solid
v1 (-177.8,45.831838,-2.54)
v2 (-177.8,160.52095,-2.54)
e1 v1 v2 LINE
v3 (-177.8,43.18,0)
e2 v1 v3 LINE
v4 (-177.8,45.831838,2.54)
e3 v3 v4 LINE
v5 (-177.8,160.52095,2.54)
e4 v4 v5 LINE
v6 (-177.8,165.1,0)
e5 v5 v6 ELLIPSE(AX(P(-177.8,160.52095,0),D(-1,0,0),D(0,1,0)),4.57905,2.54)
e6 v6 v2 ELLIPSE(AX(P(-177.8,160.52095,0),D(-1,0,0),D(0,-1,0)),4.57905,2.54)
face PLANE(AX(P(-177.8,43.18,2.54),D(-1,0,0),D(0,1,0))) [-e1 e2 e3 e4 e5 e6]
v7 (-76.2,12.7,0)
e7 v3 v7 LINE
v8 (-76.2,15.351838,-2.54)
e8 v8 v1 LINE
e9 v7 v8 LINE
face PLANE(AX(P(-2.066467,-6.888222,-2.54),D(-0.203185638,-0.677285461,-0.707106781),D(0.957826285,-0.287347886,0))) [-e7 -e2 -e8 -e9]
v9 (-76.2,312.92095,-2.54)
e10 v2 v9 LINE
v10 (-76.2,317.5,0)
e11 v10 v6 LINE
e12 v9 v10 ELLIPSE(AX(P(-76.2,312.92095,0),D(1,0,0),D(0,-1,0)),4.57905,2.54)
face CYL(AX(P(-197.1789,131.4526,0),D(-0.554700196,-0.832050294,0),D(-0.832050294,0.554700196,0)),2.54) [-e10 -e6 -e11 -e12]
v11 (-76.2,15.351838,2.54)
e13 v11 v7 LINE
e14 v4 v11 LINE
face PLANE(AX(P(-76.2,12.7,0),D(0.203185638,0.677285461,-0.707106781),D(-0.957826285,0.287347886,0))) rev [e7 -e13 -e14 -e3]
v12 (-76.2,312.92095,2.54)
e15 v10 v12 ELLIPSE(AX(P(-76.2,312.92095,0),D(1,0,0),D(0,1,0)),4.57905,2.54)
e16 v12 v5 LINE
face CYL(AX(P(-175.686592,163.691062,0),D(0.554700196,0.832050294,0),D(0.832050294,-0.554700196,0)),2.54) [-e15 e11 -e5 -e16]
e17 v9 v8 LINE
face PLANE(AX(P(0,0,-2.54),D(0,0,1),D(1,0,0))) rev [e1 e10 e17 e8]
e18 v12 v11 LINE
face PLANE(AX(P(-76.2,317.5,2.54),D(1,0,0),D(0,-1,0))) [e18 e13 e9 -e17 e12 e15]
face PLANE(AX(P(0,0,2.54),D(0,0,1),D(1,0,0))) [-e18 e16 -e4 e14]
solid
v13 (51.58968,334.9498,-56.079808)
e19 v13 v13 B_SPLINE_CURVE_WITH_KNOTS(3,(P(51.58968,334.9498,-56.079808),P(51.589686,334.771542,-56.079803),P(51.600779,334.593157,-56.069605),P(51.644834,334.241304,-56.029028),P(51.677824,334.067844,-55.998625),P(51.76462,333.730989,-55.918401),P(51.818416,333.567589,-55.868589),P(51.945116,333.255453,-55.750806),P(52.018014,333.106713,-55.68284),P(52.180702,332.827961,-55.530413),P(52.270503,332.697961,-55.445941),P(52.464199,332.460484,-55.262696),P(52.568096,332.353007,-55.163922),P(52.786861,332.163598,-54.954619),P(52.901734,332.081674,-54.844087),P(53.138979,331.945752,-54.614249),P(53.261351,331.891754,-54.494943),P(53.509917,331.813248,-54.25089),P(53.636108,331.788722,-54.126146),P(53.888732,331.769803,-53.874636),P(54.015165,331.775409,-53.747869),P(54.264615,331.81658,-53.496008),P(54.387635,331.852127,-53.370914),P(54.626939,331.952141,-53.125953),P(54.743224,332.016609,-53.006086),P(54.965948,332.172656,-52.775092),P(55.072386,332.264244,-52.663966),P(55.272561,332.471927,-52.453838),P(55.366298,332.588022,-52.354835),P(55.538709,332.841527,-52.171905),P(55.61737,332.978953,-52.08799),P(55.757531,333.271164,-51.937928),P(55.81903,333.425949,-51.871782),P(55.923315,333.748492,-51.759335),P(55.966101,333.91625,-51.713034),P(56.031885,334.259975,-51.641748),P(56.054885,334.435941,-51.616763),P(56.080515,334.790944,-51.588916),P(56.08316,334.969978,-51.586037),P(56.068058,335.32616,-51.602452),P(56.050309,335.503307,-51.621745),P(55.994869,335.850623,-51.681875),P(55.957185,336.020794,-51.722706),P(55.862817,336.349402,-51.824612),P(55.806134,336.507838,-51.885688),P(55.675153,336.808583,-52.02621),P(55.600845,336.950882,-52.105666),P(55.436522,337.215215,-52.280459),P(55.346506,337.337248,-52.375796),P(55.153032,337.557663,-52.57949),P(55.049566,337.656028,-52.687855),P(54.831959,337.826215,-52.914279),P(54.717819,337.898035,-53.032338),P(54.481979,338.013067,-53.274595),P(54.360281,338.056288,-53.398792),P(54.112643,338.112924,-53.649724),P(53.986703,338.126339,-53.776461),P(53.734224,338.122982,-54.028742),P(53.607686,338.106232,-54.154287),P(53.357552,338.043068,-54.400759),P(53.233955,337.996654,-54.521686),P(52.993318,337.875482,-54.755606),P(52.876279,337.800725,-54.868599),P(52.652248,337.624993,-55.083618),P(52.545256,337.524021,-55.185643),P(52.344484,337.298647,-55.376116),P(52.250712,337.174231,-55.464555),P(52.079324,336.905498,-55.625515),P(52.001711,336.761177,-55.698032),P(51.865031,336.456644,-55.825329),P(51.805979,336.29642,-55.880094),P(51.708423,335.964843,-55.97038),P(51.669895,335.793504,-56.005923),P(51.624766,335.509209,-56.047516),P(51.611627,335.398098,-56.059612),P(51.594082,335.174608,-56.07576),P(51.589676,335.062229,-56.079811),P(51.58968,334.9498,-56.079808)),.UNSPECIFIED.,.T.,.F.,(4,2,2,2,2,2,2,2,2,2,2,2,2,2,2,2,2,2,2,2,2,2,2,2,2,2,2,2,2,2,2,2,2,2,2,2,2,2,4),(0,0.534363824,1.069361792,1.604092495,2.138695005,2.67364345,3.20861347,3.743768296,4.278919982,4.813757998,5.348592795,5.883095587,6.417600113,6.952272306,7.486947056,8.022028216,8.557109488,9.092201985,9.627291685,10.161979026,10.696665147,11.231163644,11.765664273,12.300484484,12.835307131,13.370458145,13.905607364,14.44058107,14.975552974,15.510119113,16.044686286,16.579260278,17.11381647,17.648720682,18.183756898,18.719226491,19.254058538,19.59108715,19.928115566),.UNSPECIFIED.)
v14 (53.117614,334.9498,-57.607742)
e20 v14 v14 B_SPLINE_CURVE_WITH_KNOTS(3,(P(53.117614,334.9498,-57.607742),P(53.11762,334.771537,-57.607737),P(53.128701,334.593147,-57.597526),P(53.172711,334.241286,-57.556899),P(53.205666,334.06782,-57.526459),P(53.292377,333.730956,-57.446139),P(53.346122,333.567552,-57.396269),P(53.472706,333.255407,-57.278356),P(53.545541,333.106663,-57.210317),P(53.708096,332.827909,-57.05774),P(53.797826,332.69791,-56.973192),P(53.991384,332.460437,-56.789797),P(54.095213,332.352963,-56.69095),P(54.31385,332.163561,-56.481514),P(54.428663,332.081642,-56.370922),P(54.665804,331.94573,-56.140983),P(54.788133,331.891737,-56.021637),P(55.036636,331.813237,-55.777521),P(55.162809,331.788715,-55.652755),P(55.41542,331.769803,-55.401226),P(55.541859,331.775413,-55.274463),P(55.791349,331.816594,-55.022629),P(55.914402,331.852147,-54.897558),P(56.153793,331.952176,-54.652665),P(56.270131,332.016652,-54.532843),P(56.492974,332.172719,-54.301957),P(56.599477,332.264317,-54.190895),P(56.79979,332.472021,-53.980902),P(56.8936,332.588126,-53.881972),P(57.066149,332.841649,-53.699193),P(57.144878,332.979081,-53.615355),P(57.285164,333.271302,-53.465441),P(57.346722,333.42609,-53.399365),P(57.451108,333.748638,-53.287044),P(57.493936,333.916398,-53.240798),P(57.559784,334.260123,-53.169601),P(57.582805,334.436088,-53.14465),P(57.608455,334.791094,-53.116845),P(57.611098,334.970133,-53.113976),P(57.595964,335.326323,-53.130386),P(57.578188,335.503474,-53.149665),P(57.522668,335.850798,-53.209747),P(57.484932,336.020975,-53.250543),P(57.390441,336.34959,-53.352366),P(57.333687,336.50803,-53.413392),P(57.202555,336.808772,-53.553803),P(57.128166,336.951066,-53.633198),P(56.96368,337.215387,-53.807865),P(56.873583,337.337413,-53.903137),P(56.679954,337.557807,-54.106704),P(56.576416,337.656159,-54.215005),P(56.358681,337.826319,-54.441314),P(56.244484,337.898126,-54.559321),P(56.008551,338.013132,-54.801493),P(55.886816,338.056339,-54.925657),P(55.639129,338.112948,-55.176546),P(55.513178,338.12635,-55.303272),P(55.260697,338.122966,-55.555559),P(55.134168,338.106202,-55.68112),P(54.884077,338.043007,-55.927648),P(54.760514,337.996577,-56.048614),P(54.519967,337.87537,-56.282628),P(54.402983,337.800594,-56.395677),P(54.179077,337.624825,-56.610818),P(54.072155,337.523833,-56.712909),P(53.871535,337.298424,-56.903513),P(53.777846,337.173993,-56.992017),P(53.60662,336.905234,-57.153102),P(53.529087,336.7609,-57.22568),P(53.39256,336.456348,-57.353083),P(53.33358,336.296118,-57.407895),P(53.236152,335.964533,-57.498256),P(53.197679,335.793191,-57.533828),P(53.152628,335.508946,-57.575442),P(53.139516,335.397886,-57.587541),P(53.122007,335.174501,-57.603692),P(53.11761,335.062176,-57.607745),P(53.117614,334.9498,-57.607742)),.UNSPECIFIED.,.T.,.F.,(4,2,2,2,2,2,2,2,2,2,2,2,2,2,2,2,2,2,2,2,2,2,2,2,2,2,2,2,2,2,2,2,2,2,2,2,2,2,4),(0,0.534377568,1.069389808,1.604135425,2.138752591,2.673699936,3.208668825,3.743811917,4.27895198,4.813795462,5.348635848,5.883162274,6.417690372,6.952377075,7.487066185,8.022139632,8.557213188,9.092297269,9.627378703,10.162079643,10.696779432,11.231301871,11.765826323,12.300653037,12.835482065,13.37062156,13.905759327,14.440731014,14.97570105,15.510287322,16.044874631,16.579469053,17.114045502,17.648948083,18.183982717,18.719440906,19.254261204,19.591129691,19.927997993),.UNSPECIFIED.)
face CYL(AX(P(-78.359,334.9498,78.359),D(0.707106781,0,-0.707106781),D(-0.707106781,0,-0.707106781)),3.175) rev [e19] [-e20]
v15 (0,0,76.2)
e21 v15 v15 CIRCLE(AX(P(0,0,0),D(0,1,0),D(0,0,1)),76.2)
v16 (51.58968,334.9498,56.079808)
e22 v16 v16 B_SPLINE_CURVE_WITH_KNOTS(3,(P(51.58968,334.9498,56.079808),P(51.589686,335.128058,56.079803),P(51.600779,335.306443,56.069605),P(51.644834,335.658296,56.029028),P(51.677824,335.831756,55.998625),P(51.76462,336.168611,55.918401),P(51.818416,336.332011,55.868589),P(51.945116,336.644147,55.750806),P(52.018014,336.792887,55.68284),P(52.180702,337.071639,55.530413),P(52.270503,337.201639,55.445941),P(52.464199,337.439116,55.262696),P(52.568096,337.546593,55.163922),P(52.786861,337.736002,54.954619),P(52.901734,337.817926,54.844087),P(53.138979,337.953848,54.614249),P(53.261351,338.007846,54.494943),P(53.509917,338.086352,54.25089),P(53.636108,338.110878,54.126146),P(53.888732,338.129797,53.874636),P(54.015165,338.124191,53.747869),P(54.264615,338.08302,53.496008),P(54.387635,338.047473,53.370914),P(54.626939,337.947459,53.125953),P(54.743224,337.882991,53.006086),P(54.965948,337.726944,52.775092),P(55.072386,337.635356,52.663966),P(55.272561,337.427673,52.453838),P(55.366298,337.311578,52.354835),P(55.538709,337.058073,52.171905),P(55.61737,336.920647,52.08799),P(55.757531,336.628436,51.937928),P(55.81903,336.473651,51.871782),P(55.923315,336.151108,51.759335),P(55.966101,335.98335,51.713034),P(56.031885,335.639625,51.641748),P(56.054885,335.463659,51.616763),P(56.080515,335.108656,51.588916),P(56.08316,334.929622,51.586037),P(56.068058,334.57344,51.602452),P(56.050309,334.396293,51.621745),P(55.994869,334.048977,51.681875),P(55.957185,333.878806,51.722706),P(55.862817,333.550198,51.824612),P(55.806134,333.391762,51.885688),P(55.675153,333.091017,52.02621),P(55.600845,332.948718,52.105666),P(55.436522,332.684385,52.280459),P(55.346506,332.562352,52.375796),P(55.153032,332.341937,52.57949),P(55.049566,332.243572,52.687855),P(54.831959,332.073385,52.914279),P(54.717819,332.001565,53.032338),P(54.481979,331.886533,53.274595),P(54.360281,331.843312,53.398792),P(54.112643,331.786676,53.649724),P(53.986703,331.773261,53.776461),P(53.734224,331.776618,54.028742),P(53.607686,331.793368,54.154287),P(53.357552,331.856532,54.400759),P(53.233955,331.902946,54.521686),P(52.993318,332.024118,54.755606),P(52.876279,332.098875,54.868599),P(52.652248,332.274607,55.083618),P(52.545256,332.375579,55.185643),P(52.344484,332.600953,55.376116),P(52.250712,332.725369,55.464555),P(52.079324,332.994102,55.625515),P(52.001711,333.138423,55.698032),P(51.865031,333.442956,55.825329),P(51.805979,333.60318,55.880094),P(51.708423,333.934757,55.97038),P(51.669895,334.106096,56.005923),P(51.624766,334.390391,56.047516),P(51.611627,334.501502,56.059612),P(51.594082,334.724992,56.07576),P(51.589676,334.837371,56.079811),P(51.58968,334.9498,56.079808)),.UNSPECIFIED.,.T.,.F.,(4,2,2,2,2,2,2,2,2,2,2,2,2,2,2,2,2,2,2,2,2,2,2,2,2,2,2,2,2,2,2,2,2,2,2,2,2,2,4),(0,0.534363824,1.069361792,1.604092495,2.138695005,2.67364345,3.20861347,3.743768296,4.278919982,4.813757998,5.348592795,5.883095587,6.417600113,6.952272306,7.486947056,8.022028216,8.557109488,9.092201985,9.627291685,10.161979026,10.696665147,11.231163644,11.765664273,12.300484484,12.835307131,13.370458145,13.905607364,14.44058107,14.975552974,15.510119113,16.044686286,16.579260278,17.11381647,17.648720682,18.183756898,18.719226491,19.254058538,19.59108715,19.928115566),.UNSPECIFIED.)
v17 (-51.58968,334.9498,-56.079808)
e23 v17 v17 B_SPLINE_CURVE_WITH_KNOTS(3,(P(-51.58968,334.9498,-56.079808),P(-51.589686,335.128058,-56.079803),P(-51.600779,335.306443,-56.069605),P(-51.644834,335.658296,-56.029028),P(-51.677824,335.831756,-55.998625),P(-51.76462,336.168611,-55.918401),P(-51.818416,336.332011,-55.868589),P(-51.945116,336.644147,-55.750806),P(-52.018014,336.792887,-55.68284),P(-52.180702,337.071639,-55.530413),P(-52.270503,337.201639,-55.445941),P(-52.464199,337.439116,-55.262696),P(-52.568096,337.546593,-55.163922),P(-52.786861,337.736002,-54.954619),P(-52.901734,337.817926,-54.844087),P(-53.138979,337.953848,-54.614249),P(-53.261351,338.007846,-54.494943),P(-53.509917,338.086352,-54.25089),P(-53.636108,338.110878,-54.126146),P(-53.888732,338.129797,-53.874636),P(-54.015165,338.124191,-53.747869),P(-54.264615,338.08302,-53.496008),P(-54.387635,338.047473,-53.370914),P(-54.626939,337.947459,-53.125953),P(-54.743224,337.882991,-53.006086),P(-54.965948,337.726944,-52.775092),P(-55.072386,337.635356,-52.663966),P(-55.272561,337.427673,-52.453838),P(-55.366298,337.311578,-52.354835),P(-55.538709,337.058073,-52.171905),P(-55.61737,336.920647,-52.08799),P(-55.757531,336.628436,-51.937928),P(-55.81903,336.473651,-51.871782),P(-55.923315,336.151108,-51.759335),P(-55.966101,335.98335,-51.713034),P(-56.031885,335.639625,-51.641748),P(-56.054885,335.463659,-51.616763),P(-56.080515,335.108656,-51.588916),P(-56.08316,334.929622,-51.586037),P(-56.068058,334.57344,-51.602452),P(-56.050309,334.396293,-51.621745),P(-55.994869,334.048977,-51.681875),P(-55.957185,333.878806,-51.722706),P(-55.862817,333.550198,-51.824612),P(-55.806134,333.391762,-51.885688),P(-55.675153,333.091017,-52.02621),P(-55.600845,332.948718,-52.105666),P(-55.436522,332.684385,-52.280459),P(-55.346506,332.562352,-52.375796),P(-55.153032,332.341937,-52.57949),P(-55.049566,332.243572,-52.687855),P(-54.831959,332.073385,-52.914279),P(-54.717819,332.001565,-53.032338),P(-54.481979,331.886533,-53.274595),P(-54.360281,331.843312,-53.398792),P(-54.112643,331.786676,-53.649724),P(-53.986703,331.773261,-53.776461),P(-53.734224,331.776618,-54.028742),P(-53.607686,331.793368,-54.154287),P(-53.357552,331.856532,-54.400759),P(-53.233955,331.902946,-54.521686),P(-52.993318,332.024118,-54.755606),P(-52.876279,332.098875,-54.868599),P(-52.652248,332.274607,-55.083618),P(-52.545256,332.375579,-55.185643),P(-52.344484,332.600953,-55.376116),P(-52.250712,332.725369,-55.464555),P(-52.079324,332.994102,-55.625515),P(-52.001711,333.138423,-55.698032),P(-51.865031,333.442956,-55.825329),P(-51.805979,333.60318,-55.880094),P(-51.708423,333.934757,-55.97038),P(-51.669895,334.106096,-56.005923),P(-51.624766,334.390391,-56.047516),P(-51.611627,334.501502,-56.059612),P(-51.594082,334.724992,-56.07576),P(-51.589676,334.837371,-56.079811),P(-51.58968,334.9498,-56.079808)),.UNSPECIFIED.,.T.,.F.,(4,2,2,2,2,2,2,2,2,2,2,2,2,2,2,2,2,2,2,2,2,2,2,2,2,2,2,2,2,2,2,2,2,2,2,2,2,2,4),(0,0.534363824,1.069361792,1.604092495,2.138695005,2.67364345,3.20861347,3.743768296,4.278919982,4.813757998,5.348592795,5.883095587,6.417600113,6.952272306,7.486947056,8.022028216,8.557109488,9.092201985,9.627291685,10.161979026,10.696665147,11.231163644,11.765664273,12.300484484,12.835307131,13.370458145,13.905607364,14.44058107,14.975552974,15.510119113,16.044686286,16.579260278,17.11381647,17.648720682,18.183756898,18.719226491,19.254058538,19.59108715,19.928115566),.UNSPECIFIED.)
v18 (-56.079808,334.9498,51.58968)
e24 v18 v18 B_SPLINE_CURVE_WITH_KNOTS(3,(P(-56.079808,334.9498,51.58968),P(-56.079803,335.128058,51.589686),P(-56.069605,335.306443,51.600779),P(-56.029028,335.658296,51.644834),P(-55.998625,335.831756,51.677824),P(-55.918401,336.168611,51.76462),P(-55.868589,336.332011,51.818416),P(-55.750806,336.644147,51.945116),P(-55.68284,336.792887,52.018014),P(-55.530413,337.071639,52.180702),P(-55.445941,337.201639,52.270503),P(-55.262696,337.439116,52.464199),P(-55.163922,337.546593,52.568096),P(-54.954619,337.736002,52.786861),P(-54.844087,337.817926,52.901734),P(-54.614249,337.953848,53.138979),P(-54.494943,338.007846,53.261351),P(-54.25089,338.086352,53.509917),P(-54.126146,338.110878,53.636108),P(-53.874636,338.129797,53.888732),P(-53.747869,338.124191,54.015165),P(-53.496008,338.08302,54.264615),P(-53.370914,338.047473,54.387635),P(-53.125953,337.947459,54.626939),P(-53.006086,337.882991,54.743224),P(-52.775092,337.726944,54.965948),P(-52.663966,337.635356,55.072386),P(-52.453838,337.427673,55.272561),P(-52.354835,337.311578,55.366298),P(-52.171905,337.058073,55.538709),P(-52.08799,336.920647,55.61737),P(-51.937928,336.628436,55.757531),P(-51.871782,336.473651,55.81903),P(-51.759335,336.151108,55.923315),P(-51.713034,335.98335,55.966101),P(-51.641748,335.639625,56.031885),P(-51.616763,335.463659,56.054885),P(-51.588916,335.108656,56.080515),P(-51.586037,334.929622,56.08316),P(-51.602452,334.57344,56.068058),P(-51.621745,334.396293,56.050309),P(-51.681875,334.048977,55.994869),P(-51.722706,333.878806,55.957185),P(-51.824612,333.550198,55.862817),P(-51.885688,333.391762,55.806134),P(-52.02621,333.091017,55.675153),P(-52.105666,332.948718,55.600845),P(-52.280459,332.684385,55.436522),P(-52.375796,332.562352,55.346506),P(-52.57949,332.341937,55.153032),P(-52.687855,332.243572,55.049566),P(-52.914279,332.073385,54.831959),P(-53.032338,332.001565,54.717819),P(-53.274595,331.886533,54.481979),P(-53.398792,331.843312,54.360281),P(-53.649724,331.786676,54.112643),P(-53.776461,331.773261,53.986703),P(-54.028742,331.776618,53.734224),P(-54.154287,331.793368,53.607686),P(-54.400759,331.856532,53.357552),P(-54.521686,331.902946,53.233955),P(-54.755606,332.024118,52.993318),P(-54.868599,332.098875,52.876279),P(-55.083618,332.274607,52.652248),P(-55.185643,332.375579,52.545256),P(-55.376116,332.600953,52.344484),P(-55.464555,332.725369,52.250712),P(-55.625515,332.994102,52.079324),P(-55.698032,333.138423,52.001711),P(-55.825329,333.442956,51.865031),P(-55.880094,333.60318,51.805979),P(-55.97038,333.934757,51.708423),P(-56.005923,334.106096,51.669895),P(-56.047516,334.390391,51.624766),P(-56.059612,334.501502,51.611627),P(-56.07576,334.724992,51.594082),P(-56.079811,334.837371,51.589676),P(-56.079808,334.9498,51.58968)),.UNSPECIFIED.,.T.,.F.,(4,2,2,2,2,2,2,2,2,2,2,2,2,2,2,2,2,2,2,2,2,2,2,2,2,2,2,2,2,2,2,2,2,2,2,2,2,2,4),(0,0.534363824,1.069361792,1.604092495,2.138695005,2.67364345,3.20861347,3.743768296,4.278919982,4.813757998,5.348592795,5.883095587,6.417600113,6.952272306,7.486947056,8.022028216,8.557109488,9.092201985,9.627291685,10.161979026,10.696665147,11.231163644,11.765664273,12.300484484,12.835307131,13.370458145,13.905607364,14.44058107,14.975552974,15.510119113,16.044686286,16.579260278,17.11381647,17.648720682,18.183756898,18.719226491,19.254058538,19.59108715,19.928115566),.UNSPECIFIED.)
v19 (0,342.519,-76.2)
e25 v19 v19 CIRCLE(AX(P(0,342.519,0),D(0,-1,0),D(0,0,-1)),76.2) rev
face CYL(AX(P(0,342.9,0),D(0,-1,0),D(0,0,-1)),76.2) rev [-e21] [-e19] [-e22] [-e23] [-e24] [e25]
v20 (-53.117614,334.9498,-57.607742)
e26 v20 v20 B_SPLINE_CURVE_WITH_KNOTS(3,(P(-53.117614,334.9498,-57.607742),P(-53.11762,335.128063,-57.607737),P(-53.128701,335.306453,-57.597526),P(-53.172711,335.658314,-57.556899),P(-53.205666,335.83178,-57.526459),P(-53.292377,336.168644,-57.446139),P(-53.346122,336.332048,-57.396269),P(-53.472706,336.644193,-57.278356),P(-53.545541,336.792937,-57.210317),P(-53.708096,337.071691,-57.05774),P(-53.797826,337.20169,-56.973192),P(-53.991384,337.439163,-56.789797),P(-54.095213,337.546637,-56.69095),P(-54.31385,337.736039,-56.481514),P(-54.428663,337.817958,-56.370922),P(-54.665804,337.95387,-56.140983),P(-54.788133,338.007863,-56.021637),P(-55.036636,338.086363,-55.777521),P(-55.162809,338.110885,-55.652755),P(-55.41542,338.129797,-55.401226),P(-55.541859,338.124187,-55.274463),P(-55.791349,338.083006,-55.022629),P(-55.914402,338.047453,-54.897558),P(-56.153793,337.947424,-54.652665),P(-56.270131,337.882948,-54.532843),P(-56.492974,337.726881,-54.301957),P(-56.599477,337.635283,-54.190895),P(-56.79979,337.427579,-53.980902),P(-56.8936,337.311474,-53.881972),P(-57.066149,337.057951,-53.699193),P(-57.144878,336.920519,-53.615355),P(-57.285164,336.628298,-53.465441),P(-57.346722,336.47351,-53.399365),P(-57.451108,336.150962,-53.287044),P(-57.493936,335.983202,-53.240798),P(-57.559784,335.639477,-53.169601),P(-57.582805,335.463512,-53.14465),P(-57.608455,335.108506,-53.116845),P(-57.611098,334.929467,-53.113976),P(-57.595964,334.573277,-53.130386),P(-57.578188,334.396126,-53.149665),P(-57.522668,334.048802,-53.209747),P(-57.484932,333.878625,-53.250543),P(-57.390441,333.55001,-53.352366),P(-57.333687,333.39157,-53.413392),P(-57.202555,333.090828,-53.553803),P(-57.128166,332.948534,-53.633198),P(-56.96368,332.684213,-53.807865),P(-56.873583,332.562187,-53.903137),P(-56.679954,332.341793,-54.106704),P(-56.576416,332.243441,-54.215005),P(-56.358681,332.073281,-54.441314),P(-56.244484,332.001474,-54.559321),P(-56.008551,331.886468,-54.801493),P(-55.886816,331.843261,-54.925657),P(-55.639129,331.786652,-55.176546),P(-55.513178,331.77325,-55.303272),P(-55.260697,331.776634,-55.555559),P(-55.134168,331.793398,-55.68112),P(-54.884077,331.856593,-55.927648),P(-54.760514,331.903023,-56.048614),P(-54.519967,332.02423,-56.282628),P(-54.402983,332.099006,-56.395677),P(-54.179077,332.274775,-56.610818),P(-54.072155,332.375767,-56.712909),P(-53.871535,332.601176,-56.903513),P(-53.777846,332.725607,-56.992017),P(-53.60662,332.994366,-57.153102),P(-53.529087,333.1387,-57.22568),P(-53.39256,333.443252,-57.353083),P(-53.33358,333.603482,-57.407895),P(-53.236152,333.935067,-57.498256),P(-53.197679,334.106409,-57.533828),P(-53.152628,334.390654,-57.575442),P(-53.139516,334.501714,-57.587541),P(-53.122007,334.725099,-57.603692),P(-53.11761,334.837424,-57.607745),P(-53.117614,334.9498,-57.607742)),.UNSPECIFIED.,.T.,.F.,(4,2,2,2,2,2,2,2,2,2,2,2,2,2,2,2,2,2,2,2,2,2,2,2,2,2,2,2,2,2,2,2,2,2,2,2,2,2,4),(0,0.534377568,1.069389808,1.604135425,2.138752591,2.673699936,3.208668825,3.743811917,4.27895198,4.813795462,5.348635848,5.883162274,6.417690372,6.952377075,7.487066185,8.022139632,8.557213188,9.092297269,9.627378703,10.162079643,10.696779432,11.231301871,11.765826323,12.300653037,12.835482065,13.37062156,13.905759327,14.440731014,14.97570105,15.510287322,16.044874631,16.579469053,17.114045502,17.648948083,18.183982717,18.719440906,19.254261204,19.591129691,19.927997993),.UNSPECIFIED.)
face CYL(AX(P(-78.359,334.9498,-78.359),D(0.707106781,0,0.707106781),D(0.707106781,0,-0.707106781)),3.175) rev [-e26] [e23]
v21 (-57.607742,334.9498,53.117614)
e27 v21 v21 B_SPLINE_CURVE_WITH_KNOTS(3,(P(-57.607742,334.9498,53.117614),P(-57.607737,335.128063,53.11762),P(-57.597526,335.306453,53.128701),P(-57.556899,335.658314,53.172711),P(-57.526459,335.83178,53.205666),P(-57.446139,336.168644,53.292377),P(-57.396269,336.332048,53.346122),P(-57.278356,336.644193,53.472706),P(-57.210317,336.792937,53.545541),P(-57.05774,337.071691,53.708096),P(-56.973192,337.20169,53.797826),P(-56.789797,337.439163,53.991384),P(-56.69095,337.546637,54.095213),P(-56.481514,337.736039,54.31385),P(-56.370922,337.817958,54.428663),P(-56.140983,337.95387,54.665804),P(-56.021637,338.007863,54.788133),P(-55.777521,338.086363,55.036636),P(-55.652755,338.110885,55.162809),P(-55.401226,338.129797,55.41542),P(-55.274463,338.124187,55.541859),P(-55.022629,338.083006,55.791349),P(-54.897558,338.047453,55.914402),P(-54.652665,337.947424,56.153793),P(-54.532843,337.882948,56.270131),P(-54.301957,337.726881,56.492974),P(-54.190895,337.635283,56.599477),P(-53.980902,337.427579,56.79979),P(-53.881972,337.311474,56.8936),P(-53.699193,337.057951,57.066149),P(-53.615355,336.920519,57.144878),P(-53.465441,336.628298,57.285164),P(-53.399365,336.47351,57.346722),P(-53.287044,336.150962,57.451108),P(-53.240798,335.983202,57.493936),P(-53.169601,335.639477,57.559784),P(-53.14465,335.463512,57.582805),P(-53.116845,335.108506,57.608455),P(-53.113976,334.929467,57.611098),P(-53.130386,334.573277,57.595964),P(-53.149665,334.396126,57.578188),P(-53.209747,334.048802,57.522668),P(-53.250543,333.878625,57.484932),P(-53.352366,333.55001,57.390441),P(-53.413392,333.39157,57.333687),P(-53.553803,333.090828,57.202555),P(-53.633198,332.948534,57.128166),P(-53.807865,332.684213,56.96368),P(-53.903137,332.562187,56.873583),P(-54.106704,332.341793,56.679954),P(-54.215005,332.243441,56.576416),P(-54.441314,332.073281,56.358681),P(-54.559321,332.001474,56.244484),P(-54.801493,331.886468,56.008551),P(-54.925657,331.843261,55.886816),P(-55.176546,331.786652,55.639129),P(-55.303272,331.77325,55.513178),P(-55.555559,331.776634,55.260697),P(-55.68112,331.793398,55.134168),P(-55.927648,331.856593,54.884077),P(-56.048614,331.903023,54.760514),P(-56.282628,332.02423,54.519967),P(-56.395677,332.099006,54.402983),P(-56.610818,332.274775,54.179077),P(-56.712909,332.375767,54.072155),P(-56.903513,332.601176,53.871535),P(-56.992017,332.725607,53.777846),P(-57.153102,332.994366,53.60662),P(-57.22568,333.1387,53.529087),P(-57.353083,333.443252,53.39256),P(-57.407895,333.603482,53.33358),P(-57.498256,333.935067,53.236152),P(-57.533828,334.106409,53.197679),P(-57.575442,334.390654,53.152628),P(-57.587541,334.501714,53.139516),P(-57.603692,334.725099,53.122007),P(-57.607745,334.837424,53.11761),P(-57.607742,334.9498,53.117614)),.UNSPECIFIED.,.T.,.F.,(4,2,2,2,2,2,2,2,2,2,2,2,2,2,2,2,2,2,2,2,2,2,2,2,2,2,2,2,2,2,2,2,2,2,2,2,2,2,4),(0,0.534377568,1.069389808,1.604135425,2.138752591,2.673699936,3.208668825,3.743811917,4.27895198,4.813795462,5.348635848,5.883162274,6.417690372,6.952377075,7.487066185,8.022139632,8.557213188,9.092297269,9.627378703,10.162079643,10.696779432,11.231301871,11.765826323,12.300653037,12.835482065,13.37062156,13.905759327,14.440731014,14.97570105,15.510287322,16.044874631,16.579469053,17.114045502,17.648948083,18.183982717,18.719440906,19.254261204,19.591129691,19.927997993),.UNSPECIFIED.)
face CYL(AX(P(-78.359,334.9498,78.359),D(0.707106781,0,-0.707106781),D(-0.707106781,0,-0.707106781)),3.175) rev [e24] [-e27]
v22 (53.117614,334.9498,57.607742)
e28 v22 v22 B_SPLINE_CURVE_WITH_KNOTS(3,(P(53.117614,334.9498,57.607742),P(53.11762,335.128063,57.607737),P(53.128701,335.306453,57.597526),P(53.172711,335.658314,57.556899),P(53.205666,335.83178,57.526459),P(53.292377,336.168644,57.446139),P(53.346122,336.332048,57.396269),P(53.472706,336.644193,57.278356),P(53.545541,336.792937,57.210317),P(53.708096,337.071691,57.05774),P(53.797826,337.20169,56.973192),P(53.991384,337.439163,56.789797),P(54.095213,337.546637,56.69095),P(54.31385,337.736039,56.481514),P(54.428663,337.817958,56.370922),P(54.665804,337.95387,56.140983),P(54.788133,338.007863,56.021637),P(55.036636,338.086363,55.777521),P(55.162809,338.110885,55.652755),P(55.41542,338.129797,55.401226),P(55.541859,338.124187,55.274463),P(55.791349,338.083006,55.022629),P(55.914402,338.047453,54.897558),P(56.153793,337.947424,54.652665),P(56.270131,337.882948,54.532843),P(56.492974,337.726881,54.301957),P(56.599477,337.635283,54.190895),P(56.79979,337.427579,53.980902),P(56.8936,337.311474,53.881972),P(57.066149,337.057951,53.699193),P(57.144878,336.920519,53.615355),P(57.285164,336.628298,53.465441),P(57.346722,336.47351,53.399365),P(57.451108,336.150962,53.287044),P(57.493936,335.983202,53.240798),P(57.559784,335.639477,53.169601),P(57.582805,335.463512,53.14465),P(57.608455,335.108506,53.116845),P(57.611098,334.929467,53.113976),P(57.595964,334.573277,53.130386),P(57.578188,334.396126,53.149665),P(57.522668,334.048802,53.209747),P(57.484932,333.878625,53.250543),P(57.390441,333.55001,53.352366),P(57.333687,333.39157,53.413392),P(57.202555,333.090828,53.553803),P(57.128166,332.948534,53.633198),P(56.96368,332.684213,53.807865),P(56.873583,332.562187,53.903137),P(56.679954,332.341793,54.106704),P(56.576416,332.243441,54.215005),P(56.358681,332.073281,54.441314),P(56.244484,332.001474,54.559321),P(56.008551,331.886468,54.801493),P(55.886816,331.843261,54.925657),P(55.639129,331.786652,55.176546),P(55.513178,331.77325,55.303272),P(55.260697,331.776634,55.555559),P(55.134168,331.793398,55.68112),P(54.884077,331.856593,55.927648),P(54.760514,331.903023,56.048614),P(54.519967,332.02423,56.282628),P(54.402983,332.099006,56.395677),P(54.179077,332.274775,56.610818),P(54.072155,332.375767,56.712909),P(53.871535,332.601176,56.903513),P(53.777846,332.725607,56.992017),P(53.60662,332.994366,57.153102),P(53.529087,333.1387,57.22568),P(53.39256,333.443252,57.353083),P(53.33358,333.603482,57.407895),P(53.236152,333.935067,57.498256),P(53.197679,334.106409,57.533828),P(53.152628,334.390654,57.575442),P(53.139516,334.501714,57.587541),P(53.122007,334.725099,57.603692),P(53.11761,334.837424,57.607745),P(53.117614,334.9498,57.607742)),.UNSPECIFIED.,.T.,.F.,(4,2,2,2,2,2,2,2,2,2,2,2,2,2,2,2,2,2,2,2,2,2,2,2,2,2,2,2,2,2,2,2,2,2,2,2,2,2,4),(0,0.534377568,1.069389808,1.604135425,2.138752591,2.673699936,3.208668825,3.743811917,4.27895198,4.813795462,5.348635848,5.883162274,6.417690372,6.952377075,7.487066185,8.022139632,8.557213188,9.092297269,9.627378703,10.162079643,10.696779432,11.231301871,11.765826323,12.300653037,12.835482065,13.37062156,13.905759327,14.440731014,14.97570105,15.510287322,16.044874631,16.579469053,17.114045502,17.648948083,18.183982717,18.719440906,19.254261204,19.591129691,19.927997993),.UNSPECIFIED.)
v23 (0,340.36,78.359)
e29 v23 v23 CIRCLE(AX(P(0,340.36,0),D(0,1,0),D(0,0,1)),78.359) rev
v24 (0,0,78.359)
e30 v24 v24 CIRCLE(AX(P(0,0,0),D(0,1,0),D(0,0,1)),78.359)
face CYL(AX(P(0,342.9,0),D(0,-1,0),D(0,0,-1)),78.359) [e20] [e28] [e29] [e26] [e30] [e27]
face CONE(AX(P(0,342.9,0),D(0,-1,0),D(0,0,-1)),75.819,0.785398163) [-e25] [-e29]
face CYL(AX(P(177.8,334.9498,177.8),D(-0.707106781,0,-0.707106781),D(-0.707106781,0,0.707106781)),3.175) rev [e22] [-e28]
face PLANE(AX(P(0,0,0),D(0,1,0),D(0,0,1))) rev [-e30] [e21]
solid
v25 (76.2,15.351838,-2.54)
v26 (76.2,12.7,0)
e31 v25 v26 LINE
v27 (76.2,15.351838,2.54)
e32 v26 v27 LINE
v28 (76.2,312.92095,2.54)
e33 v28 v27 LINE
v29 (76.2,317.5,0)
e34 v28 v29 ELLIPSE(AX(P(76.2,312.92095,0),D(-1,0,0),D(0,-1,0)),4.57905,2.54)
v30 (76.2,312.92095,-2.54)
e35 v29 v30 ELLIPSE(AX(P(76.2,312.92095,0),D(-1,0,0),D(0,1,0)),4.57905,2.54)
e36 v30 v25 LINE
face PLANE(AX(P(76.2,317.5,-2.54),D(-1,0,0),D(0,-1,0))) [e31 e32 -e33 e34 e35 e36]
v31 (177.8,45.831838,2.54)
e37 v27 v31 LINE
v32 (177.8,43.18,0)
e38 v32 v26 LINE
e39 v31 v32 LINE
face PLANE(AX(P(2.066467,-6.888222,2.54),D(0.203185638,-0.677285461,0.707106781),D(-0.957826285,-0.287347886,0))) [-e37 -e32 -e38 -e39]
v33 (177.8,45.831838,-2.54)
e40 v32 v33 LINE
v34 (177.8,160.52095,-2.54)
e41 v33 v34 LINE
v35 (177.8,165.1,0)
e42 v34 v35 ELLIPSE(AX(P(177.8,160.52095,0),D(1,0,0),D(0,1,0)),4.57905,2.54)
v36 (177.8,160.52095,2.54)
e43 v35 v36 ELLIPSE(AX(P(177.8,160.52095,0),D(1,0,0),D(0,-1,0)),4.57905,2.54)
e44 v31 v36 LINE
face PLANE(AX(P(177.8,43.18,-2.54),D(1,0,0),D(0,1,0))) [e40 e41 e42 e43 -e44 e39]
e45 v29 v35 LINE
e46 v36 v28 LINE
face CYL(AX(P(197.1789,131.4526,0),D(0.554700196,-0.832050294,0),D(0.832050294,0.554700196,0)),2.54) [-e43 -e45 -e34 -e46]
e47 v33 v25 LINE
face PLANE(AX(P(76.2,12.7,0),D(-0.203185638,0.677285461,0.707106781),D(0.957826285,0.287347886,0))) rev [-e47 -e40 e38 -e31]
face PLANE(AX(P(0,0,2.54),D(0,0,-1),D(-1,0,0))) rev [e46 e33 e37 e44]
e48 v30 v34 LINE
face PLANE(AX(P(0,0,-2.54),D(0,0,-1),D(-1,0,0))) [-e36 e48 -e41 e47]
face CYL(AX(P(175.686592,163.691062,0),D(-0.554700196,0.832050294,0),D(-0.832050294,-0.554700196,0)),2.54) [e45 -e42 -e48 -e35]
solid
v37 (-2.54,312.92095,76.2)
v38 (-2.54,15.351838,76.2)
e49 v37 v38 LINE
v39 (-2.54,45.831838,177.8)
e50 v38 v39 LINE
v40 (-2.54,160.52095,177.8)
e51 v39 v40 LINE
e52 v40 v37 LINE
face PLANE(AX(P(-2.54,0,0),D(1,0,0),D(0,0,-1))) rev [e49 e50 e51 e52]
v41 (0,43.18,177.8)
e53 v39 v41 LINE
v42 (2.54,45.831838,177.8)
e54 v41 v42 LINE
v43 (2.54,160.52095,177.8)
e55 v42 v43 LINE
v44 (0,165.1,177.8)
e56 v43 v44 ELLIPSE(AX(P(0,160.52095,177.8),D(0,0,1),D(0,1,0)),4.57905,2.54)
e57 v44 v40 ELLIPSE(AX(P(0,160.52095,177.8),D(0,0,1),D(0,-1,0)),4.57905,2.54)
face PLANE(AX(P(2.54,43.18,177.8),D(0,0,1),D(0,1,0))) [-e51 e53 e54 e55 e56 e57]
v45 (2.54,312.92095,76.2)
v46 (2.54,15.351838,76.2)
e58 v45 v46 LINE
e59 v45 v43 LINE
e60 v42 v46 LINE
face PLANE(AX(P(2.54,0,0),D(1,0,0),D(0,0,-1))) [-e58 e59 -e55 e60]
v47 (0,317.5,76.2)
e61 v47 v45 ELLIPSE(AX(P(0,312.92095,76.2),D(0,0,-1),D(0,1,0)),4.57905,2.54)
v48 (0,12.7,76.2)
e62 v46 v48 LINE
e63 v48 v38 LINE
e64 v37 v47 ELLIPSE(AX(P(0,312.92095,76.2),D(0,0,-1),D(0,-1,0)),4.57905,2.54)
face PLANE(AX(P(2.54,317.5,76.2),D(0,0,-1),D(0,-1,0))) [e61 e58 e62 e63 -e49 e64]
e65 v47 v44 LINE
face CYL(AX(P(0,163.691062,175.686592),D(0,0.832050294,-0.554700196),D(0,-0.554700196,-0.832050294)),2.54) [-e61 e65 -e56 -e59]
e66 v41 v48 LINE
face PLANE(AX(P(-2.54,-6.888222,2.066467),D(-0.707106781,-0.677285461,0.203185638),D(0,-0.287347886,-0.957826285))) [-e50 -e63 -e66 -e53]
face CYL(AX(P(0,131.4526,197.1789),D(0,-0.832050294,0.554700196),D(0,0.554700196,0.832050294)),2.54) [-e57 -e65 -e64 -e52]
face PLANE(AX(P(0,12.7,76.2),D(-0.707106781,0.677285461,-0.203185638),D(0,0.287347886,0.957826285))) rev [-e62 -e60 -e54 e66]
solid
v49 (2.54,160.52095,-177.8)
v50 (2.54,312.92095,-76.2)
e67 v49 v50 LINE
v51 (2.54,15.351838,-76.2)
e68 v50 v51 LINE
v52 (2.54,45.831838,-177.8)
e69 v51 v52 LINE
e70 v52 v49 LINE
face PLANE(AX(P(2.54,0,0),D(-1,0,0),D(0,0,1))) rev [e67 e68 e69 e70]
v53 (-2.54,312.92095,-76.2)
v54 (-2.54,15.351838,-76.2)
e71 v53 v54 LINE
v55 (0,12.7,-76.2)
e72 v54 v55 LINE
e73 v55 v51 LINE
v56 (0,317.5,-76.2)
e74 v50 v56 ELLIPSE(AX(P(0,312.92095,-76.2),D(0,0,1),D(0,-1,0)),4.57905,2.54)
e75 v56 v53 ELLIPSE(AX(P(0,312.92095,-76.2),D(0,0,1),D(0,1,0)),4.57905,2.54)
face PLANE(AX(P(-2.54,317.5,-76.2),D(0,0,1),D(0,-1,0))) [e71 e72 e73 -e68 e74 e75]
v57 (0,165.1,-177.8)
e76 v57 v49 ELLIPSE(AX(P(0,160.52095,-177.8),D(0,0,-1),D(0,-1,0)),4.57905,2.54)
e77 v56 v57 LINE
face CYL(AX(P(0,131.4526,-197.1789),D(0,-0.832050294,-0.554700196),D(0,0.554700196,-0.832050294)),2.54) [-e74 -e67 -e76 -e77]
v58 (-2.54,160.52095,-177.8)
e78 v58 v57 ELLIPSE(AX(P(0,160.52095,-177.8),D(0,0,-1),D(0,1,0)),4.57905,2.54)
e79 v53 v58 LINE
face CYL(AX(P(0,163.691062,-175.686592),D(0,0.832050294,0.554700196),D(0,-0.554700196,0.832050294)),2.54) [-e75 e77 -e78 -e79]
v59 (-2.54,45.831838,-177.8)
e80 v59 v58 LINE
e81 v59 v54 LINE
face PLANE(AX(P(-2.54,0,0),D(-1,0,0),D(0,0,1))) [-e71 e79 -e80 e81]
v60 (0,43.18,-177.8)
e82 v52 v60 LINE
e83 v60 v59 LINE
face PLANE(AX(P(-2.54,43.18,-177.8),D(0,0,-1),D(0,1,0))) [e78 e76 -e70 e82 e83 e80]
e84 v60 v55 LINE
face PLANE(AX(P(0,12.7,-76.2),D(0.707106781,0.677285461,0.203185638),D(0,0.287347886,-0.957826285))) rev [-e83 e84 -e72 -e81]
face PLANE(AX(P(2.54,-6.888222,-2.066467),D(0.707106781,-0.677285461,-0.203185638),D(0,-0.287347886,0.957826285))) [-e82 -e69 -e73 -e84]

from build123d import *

# Parameters (mm, degrees)
SKETCH1_R                = 78.359
SKETCH1_R_2              = 76.2
BOSS_EXTRUDE1_DEPTH      = 342.9
BOSS_EXTRUDE2_DEPTH      = 2.54
BOSS_EXTRUDE2_DEPTH_BACK = 2.54
FILLET2_R                = 2.54
CHAMFER2_SIZE            = 2.54
CIRPATTERN1_COUNT        = 4
SKETCH4_R                = 3.175
CUT_EXTRUDE1_DEPTH       = 426.212993687
CIRPATTERN2_COUNT        = 4
CHAMFER3_SIZE            = 2.54


# Some blends are built 0.0001 mm under size
with BuildPart() as part:
    # Sketch1 → Boss-Extrude1 (new body)
    with BuildSketch(Plane(origin=(0, 0, 0), x_dir=(1, 0, 0), z_dir=(0, 1, 0))):
        with Locations(Location((0, 0, 0), (0, 0, 270))):
            Circle(SKETCH1_R)
        with Locations(Location((0, 0, 0), (0, 0, 270))):
            Circle(SKETCH1_R_2, mode=Mode.SUBTRACT)
    extrude(amount=BOSS_EXTRUDE1_DEPTH)

    # Sketch4 → Cut-Extrude1 (cut, through all)
    with BuildSketch(Plane(origin=(0, 0, 0), x_dir=(-0.7071067811865462, 0, 0.7071067811865489), z_dir=(-0.7071067811865489, 0, -0.7071067811865462))):
        with Locations((0, 334.9498)):
            Circle(SKETCH4_R)
    cut_extrude1 = extrude(amount=-CUT_EXTRUDE1_DEPTH, mode=Mode.SUBTRACT)

    # CirPattern2: Cut-Extrude1 ×4 about axis
    cirpattern2_axis = Axis((0, -69.284011973, 0), (0, 1, 0))
    for i in range(1, CIRPATTERN2_COUNT):
        add(cut_extrude1.rotate(cirpattern2_axis, i * 360 / CIRPATTERN2_COUNT), mode=Mode.SUBTRACT)

    # Chamfer3
    # the kernel refuses this chamfer: 2.54 mm, written as the material it takes off along each edge
    with BuildSketch(Plane(origin=(0, 342.9, 0), x_dir=(0, 0, 1), z_dir=(-1, 0, 0))) as chamfer3_piece_1:
        Polygon((78.359, -CHAMFER3_SIZE), (78.359 - CHAMFER3_SIZE, 0), (78.359, 0), align=None)
    revolve(axis=Axis((0, 342.9, 0), (0, 1, 0)), mode=Mode.SUBTRACT)


with BuildPart() as body_2:
    # Sketch2 → Boss-Extrude2 (new, two sides: drawn at the far end of the back side and taken through both)
    with BuildSketch(Plane.XY.offset(-BOSS_EXTRUDE2_DEPTH_BACK)):
        Polygon((76.2, 317.5), (76.2, 12.7), (177.8, 43.18), (177.8, 165.1), align=None)
    extrude(amount=BOSS_EXTRUDE2_DEPTH + BOSS_EXTRUDE2_DEPTH_BACK)

    # Fillet2
    fillet2_edges = [body_2.edges().sort_by_distance(p)[0] for p in [
        (127, 241.3, -2.54),
        (127, 241.3, 2.54),
    ]]
    fillet(fillet2_edges, radius=FILLET2_R - 0.0001)  # a hair under: the kernel refuses the full size

    # Chamfer2
    chamfer2_edges = [body_2.edges().sort_by_distance(p)[0] for p in [
        (127, 27.94, -2.54),
        (127, 27.94, 2.54),
    ]]
    chamfer(chamfer2_edges, length=CHAMFER2_SIZE - 0.0001)  # a hair under: the kernel refuses the full size


with BuildPart() as cirpattern1_1:
    # CirPattern1: pattern copy
    add(body_2.part.rotate(Axis((0, 0, 0), (0, 1, 0)), 1 * 360 / CIRPATTERN1_COUNT))


with BuildPart() as cirpattern1_2:
    # CirPattern1: pattern copy
    add(body_2.part.rotate(Axis((0, 0, 0), (0, 1, 0)), 2 * 360 / CIRPATTERN1_COUNT))


with BuildPart() as cirpattern1_3:
    # CirPattern1: pattern copy
    add(body_2.part.rotate(Axis((0, 0, 0), (0, 1, 0)), 3 * 360 / CIRPATTERN1_COUNT))


solid = Compound([part.part, body_2.part, cirpattern1_1.part, cirpattern1_2.part, cirpattern1_3.part])
